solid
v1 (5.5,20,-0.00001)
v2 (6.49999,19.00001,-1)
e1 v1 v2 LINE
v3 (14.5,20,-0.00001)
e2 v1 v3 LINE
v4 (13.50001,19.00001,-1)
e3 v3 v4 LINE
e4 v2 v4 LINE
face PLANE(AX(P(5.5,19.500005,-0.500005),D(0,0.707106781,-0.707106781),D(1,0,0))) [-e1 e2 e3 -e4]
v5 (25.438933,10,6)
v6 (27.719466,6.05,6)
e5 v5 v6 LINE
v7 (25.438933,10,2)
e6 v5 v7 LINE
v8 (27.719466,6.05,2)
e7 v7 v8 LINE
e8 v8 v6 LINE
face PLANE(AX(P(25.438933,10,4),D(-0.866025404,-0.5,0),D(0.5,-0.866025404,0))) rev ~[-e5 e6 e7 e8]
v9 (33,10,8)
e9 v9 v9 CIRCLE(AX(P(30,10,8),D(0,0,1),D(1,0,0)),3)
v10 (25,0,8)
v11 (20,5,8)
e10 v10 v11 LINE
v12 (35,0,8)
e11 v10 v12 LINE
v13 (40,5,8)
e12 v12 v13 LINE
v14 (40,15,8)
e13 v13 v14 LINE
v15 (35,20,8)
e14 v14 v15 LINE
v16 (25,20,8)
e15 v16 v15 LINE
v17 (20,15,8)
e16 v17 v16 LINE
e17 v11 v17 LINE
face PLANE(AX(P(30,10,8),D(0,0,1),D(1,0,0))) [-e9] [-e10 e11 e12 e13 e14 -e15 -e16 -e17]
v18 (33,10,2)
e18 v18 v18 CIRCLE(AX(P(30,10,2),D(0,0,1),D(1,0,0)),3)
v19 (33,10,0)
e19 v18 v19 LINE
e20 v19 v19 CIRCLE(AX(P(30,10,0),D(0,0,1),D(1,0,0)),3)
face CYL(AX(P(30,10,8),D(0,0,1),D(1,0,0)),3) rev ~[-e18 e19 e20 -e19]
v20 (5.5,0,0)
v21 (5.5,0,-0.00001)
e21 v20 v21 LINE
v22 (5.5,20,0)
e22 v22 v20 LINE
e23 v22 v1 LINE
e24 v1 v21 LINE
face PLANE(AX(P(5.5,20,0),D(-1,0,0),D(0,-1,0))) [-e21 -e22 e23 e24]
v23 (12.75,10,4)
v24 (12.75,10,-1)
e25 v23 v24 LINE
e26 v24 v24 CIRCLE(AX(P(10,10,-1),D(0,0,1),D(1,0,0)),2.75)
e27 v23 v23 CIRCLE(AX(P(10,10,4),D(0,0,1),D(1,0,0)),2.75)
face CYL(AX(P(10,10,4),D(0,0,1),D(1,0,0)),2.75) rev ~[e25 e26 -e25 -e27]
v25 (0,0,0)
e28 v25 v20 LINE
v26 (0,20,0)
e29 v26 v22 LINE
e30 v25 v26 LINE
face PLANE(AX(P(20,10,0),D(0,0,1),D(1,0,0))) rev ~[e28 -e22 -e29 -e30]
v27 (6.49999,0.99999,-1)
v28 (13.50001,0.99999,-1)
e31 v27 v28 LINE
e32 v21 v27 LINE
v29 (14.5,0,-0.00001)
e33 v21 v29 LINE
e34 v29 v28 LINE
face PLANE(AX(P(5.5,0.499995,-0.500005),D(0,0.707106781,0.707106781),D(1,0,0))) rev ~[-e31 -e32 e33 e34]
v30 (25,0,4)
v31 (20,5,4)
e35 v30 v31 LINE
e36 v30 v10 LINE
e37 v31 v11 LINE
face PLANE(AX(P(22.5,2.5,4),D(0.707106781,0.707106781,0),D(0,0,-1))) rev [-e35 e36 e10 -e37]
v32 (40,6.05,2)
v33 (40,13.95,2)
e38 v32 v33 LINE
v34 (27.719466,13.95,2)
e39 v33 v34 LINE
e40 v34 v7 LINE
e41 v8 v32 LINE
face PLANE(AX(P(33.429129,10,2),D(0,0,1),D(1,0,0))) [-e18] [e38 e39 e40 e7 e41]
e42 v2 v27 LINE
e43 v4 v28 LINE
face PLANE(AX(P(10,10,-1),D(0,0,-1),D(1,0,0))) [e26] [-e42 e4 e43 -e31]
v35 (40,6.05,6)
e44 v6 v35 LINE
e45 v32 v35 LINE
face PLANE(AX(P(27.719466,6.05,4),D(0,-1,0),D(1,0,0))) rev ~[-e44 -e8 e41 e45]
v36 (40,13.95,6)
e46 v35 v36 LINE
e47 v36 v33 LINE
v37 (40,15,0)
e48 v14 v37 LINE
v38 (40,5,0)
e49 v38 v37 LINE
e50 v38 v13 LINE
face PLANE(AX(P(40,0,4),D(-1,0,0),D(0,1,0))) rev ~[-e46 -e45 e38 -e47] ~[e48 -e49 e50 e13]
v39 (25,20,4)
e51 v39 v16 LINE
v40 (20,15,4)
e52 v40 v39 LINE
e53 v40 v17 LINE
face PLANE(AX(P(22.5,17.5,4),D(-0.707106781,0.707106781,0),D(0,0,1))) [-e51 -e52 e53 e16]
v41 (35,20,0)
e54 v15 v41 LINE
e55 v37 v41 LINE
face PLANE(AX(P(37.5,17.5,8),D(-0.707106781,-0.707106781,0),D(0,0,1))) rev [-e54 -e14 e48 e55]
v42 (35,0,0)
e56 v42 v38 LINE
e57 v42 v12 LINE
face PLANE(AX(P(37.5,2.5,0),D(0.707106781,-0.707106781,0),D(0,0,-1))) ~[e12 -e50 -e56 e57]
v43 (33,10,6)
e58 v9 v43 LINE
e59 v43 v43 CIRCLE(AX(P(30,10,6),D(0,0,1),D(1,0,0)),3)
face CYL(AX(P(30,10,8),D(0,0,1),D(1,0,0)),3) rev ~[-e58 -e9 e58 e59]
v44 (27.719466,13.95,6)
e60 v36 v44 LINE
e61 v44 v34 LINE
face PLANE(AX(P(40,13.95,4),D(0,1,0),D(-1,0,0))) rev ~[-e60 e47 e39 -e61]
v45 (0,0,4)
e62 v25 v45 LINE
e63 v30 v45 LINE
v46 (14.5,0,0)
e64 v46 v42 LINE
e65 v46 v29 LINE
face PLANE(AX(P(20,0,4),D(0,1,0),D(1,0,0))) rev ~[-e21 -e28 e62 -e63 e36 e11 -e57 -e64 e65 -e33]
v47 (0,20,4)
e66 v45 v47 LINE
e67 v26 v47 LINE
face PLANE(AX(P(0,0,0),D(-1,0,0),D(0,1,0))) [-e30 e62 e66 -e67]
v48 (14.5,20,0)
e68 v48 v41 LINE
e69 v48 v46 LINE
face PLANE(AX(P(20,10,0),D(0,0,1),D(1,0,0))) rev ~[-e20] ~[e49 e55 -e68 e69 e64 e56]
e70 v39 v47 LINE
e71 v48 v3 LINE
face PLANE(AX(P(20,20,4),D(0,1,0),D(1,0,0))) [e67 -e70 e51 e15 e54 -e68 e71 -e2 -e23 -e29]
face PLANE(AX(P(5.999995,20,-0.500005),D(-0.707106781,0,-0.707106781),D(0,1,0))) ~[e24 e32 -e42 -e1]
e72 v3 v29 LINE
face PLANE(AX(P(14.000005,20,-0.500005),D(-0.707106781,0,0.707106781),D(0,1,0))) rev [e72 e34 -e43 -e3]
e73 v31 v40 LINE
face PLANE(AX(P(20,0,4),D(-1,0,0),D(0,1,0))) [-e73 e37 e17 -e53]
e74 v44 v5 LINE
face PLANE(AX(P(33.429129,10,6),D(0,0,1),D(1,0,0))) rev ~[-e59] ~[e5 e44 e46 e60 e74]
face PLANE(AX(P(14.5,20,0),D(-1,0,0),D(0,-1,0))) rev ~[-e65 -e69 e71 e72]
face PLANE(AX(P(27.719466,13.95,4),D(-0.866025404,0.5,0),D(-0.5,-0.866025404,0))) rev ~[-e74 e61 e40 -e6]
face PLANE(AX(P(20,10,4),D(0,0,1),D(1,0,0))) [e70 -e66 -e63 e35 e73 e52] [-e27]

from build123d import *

# Parameters (mm, degrees)
F0_W      = 40
F0_H      = 20
F1_DEPTH  = 4
F2_W      = 20
F2_H      = 20
F3_DEPTH  = 4
F4_W      = 9
F4_H      = 20
F5_DEPTH  = 1
F6_SIZE   = 0.99999
F7_R      = 2.75
F8_DEPTH  = 5.001
F9_SIZE   = 5
F10_R     = 3
F11_DEPTH = 9.001
F13_DEPTH = 2


# Not quite as in the source:
# - a fillet or chamfer is up to 0.001 mm smaller than in the source, because OpenCascade refuses the exact size


with BuildPart() as f1:
    # F0 (on Top) → F1 (new body)
    with BuildSketch(Plane.XY):
        with Locations((20, 10)):
            Rectangle(F0_W, F0_H)
    extrude(amount=F1_DEPTH)

    # F2 (on face) → F3 (join)
    with BuildSketch(Plane.XY.offset(4)):
        with Locations((30, 10)):
            Rectangle(F2_W, F2_H)
    extrude(amount=F3_DEPTH)

    # F4 (on face) → F5 (join)
    with BuildSketch(Plane(origin=(0, 0, 0), x_dir=(1, 0, 0), z_dir=(0, 0, -1))):
        with Locations((10, -10)):
            Rectangle(F4_W, F4_H)
    extrude(amount=F5_DEPTH)

    # F6 (size 1 in the source; OpenCascade refuses exactly that, so slightly less here)
    f6_edges = [f1.edges().sort_by_distance(p)[0] for p in [
        (10, 0, -1),
        (5.5, 10, -1),
        (10, 20, -1),
        (14.5, 10, -1),
    ]]
    chamfer(f6_edges, length=F6_SIZE)

    # F7 (on face) → F8 (cut, through all)
    with BuildSketch(Plane.XY.offset(4)):
        with Locations((10, 10)):
            Circle(F7_R)
    extrude(amount=-F8_DEPTH, mode=Mode.SUBTRACT)

    # F9
    f9_edges = [f1.edges().sort_by_distance(p)[0] for p in [
        (40, 0, 4),
        (40, 20, 4),
        (20, 0, 6),
        (20, 20, 6),
    ]]
    chamfer(f9_edges, length=F9_SIZE)

    # F10 (on face) → F11 (cut, through all)
    with BuildSketch(Plane.XY.offset(8)):
        with Locations((30, 10)):
            Circle(F10_R)
    extrude(amount=-F11_DEPTH, mode=Mode.SUBTRACT)

    # F12 (on face) → F13 (cut, symmetric)
    with BuildSketch(Plane.XY.offset(4)):
        Polygon((25.4389328734, 10), (27.7194664367, 6.05), (40, 6.05), (40, 13.95), (27.7194664367, 13.95), align=None)
    extrude(amount=F13_DEPTH, both=True, mode=Mode.SUBTRACT)


solid = f1.part
